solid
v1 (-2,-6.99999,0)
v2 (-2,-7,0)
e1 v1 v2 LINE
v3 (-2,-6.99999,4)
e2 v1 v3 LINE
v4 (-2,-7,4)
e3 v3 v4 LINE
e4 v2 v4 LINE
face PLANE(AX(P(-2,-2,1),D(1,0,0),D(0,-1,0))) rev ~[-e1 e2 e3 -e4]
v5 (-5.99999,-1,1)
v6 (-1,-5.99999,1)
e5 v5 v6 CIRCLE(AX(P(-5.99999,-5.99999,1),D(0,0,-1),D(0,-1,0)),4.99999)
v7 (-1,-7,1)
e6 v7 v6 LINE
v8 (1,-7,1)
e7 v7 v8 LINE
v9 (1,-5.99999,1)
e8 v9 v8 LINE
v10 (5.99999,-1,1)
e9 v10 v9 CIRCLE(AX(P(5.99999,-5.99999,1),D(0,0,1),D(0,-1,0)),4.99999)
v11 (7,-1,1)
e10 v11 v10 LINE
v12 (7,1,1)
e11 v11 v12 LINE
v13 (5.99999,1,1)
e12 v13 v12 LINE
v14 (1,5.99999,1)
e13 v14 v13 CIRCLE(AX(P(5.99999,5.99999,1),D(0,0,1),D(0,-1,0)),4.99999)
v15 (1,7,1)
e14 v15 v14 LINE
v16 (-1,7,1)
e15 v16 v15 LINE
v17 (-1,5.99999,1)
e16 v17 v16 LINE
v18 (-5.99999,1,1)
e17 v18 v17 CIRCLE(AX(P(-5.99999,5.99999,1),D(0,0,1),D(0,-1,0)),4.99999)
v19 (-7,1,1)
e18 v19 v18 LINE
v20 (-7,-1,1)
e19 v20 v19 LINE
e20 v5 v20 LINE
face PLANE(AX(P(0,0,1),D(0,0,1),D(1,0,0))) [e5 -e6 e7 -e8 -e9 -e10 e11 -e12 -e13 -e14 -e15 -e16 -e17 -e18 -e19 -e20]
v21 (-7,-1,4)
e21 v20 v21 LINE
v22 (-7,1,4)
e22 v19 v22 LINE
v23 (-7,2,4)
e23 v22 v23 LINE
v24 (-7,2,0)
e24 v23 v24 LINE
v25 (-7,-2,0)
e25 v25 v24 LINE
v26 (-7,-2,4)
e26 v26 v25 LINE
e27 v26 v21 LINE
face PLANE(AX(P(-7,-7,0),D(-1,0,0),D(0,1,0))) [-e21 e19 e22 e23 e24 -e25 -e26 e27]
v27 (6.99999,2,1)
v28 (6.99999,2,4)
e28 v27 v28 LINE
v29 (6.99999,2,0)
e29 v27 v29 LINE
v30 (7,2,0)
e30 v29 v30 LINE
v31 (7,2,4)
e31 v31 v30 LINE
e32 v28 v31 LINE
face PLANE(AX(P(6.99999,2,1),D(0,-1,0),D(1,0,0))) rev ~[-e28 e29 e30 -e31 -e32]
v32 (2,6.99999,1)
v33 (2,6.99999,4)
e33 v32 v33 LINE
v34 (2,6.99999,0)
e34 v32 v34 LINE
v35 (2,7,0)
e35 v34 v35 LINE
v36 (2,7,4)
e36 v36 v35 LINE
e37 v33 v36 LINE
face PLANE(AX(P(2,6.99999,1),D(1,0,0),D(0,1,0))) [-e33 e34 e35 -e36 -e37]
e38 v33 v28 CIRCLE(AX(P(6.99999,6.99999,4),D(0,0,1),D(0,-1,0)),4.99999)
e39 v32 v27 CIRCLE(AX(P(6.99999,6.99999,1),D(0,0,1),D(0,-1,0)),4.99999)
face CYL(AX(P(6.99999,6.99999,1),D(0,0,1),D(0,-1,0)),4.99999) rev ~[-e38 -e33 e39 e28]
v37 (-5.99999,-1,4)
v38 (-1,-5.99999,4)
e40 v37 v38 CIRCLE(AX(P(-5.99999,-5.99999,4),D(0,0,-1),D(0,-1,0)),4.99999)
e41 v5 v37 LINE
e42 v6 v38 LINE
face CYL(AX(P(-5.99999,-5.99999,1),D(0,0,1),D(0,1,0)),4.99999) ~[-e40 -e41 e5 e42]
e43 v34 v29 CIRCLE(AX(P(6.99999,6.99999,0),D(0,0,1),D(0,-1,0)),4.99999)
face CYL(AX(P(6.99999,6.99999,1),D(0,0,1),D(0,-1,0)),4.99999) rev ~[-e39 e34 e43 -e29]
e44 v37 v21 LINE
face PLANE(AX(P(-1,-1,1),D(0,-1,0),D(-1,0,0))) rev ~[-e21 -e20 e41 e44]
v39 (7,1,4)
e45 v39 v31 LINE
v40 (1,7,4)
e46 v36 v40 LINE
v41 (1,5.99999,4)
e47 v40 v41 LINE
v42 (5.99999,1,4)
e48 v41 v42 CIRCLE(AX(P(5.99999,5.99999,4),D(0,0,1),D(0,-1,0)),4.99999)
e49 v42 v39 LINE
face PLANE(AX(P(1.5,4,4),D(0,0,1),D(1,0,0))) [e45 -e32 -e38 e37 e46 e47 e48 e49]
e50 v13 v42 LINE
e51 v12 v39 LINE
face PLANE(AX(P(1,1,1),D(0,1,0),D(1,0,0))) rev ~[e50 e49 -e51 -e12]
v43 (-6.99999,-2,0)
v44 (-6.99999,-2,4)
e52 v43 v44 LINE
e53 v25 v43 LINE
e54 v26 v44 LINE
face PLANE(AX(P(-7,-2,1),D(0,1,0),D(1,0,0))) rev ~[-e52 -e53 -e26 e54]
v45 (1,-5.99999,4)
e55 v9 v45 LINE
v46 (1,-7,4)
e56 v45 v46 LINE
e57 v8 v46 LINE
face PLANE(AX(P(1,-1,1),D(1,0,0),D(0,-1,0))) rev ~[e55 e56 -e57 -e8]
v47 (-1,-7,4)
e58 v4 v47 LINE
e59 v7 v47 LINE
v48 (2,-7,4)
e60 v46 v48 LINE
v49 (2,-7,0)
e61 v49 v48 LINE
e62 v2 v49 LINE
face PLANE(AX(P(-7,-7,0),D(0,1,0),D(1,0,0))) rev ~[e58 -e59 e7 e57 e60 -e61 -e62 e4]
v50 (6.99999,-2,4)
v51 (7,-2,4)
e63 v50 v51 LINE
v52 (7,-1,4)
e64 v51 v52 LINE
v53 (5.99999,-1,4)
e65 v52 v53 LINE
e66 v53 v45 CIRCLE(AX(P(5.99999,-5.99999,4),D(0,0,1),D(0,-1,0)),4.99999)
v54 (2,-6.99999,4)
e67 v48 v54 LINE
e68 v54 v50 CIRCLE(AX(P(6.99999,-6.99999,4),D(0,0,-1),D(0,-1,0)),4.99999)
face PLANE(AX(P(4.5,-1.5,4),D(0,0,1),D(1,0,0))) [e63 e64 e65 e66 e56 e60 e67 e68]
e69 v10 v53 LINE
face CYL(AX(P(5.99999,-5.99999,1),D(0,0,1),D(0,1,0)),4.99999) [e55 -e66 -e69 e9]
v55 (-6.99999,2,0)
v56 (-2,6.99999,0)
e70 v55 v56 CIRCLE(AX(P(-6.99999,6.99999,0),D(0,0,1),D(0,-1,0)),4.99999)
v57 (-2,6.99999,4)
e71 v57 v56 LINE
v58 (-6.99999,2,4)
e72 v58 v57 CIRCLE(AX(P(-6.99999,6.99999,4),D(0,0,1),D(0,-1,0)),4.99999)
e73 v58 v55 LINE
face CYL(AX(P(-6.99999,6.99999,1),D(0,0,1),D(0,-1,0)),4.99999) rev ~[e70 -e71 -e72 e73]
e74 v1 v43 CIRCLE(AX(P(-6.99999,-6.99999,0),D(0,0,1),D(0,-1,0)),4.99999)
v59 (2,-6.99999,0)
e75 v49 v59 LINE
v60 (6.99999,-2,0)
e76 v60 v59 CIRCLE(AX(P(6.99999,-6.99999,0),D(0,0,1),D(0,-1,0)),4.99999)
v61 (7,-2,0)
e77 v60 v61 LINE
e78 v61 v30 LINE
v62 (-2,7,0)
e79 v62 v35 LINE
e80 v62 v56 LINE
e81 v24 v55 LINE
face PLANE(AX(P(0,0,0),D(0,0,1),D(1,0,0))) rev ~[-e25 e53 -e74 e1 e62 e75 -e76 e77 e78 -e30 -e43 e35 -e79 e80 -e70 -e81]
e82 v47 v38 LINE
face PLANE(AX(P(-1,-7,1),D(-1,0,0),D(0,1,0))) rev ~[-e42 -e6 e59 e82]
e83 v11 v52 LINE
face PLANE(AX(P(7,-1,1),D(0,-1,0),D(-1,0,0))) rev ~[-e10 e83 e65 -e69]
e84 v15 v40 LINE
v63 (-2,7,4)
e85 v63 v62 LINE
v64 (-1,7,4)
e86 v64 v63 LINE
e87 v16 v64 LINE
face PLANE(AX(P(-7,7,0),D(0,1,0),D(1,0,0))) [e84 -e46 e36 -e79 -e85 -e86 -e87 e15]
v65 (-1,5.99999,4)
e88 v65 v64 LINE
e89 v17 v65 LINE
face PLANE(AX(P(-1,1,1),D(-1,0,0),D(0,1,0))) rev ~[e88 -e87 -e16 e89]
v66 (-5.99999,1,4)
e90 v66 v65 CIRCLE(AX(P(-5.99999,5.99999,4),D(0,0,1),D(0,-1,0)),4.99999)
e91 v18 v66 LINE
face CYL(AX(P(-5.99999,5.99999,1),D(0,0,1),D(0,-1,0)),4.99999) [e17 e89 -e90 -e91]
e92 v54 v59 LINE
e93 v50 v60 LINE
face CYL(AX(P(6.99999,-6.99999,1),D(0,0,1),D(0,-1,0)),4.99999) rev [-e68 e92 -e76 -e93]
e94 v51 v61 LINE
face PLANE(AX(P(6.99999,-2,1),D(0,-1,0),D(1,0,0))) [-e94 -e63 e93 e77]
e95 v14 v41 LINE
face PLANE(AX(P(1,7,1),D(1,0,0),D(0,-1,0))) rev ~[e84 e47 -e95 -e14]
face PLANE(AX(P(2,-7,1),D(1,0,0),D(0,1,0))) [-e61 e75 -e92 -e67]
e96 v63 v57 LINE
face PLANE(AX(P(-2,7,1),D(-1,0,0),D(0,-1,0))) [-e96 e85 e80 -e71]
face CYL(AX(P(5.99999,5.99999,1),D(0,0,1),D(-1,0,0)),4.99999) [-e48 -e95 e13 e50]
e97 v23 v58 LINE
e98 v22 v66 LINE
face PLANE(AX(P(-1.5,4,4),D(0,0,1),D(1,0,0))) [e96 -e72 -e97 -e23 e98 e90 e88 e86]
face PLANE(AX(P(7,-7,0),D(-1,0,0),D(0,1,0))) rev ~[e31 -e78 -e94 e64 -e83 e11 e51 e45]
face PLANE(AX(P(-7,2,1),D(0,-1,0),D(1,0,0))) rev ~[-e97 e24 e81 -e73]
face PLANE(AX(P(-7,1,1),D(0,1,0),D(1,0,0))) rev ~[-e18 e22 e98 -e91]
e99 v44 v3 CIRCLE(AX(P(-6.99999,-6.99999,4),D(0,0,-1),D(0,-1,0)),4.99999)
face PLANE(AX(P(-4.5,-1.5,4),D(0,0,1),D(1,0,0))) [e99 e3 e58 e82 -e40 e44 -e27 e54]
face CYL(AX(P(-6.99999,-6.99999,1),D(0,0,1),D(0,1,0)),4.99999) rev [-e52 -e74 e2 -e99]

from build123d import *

# Parameters (mm, degrees)
F0_W     = 14
F0_H     = 14
F1_DEPTH = 1
F2_W     = 5
F2_H     = 1
F3_DEPTH = 3
F4_R     = 4.99999
F5_DEPTH = 25


# Not quite as in the source:
# - a fillet or chamfer is up to 0.001 mm smaller than in the source, because OpenCascade refuses the exact size


with BuildPart() as f1:
    # F0 (on Top) → F1 (new body)
    with BuildSketch(Plane.XY):
        Rectangle(F0_W, F0_H)
    extrude(amount=F1_DEPTH)

    # F2 (on face) → F3 (join)
    with BuildSketch(Plane.XY.offset(1)):
        Polygon((-1, 1), (-1, 7), (-2, 7), (-2, 2), (-2, 1), align=None)
        with Locations((-4.5, 1.5)):
            Rectangle(F2_W, F2_H)
        Polygon((1, 1), (2, 1), (2, 2), (2, 7), (1, 7), align=None)
        with Locations((4.5, 1.5)):
            Rectangle(F2_W, F2_H)
        with Locations((4.5, -1.5)):
            Rectangle(F2_W, F2_H)
        Polygon((2, -1), (1, -1), (1, -7), (2, -7), (2, -2), align=None)
        with Locations((-4.5, -1.5)):
            Rectangle(F2_W, F2_H)
        Polygon((-2, -7), (-1, -7), (-1, -1), (-2, -1), (-2, -2), align=None)
    extrude(amount=F3_DEPTH)

    # F4 (radius 5 in the source; OpenCascade refuses exactly that, so slightly less here)
    f4_edges = [f1.edges().sort_by_distance(p)[0] for p in [
        (2, -2, 2.5),
        (-1, -1, 2.5),
        (-1, 1, 2.5),
        (1, 1, 2.5),
        (2, 2, 2.5),
        (-2, 2, 2.5),
        (-2, -2, 2.5),
        (1, -1, 2.5),
    ]]
    fillet(f4_edges, radius=F4_R)

    # F5 (cut): faces of the model
    f5_faces = [f1.faces().sort_by_distance(p)[0] for p in [
        (4.8779327776, -4.8779327776, 1),
        (4.8779327776, 4.8779327776, 1),
        (-4.8779327776, 4.8779327776, 1),
        (-4.8779327776, -4.8779327776, 1),
    ]]
    extrude(f5_faces, amount=-F5_DEPTH, mode=Mode.SUBTRACT)


solid = f1.part
